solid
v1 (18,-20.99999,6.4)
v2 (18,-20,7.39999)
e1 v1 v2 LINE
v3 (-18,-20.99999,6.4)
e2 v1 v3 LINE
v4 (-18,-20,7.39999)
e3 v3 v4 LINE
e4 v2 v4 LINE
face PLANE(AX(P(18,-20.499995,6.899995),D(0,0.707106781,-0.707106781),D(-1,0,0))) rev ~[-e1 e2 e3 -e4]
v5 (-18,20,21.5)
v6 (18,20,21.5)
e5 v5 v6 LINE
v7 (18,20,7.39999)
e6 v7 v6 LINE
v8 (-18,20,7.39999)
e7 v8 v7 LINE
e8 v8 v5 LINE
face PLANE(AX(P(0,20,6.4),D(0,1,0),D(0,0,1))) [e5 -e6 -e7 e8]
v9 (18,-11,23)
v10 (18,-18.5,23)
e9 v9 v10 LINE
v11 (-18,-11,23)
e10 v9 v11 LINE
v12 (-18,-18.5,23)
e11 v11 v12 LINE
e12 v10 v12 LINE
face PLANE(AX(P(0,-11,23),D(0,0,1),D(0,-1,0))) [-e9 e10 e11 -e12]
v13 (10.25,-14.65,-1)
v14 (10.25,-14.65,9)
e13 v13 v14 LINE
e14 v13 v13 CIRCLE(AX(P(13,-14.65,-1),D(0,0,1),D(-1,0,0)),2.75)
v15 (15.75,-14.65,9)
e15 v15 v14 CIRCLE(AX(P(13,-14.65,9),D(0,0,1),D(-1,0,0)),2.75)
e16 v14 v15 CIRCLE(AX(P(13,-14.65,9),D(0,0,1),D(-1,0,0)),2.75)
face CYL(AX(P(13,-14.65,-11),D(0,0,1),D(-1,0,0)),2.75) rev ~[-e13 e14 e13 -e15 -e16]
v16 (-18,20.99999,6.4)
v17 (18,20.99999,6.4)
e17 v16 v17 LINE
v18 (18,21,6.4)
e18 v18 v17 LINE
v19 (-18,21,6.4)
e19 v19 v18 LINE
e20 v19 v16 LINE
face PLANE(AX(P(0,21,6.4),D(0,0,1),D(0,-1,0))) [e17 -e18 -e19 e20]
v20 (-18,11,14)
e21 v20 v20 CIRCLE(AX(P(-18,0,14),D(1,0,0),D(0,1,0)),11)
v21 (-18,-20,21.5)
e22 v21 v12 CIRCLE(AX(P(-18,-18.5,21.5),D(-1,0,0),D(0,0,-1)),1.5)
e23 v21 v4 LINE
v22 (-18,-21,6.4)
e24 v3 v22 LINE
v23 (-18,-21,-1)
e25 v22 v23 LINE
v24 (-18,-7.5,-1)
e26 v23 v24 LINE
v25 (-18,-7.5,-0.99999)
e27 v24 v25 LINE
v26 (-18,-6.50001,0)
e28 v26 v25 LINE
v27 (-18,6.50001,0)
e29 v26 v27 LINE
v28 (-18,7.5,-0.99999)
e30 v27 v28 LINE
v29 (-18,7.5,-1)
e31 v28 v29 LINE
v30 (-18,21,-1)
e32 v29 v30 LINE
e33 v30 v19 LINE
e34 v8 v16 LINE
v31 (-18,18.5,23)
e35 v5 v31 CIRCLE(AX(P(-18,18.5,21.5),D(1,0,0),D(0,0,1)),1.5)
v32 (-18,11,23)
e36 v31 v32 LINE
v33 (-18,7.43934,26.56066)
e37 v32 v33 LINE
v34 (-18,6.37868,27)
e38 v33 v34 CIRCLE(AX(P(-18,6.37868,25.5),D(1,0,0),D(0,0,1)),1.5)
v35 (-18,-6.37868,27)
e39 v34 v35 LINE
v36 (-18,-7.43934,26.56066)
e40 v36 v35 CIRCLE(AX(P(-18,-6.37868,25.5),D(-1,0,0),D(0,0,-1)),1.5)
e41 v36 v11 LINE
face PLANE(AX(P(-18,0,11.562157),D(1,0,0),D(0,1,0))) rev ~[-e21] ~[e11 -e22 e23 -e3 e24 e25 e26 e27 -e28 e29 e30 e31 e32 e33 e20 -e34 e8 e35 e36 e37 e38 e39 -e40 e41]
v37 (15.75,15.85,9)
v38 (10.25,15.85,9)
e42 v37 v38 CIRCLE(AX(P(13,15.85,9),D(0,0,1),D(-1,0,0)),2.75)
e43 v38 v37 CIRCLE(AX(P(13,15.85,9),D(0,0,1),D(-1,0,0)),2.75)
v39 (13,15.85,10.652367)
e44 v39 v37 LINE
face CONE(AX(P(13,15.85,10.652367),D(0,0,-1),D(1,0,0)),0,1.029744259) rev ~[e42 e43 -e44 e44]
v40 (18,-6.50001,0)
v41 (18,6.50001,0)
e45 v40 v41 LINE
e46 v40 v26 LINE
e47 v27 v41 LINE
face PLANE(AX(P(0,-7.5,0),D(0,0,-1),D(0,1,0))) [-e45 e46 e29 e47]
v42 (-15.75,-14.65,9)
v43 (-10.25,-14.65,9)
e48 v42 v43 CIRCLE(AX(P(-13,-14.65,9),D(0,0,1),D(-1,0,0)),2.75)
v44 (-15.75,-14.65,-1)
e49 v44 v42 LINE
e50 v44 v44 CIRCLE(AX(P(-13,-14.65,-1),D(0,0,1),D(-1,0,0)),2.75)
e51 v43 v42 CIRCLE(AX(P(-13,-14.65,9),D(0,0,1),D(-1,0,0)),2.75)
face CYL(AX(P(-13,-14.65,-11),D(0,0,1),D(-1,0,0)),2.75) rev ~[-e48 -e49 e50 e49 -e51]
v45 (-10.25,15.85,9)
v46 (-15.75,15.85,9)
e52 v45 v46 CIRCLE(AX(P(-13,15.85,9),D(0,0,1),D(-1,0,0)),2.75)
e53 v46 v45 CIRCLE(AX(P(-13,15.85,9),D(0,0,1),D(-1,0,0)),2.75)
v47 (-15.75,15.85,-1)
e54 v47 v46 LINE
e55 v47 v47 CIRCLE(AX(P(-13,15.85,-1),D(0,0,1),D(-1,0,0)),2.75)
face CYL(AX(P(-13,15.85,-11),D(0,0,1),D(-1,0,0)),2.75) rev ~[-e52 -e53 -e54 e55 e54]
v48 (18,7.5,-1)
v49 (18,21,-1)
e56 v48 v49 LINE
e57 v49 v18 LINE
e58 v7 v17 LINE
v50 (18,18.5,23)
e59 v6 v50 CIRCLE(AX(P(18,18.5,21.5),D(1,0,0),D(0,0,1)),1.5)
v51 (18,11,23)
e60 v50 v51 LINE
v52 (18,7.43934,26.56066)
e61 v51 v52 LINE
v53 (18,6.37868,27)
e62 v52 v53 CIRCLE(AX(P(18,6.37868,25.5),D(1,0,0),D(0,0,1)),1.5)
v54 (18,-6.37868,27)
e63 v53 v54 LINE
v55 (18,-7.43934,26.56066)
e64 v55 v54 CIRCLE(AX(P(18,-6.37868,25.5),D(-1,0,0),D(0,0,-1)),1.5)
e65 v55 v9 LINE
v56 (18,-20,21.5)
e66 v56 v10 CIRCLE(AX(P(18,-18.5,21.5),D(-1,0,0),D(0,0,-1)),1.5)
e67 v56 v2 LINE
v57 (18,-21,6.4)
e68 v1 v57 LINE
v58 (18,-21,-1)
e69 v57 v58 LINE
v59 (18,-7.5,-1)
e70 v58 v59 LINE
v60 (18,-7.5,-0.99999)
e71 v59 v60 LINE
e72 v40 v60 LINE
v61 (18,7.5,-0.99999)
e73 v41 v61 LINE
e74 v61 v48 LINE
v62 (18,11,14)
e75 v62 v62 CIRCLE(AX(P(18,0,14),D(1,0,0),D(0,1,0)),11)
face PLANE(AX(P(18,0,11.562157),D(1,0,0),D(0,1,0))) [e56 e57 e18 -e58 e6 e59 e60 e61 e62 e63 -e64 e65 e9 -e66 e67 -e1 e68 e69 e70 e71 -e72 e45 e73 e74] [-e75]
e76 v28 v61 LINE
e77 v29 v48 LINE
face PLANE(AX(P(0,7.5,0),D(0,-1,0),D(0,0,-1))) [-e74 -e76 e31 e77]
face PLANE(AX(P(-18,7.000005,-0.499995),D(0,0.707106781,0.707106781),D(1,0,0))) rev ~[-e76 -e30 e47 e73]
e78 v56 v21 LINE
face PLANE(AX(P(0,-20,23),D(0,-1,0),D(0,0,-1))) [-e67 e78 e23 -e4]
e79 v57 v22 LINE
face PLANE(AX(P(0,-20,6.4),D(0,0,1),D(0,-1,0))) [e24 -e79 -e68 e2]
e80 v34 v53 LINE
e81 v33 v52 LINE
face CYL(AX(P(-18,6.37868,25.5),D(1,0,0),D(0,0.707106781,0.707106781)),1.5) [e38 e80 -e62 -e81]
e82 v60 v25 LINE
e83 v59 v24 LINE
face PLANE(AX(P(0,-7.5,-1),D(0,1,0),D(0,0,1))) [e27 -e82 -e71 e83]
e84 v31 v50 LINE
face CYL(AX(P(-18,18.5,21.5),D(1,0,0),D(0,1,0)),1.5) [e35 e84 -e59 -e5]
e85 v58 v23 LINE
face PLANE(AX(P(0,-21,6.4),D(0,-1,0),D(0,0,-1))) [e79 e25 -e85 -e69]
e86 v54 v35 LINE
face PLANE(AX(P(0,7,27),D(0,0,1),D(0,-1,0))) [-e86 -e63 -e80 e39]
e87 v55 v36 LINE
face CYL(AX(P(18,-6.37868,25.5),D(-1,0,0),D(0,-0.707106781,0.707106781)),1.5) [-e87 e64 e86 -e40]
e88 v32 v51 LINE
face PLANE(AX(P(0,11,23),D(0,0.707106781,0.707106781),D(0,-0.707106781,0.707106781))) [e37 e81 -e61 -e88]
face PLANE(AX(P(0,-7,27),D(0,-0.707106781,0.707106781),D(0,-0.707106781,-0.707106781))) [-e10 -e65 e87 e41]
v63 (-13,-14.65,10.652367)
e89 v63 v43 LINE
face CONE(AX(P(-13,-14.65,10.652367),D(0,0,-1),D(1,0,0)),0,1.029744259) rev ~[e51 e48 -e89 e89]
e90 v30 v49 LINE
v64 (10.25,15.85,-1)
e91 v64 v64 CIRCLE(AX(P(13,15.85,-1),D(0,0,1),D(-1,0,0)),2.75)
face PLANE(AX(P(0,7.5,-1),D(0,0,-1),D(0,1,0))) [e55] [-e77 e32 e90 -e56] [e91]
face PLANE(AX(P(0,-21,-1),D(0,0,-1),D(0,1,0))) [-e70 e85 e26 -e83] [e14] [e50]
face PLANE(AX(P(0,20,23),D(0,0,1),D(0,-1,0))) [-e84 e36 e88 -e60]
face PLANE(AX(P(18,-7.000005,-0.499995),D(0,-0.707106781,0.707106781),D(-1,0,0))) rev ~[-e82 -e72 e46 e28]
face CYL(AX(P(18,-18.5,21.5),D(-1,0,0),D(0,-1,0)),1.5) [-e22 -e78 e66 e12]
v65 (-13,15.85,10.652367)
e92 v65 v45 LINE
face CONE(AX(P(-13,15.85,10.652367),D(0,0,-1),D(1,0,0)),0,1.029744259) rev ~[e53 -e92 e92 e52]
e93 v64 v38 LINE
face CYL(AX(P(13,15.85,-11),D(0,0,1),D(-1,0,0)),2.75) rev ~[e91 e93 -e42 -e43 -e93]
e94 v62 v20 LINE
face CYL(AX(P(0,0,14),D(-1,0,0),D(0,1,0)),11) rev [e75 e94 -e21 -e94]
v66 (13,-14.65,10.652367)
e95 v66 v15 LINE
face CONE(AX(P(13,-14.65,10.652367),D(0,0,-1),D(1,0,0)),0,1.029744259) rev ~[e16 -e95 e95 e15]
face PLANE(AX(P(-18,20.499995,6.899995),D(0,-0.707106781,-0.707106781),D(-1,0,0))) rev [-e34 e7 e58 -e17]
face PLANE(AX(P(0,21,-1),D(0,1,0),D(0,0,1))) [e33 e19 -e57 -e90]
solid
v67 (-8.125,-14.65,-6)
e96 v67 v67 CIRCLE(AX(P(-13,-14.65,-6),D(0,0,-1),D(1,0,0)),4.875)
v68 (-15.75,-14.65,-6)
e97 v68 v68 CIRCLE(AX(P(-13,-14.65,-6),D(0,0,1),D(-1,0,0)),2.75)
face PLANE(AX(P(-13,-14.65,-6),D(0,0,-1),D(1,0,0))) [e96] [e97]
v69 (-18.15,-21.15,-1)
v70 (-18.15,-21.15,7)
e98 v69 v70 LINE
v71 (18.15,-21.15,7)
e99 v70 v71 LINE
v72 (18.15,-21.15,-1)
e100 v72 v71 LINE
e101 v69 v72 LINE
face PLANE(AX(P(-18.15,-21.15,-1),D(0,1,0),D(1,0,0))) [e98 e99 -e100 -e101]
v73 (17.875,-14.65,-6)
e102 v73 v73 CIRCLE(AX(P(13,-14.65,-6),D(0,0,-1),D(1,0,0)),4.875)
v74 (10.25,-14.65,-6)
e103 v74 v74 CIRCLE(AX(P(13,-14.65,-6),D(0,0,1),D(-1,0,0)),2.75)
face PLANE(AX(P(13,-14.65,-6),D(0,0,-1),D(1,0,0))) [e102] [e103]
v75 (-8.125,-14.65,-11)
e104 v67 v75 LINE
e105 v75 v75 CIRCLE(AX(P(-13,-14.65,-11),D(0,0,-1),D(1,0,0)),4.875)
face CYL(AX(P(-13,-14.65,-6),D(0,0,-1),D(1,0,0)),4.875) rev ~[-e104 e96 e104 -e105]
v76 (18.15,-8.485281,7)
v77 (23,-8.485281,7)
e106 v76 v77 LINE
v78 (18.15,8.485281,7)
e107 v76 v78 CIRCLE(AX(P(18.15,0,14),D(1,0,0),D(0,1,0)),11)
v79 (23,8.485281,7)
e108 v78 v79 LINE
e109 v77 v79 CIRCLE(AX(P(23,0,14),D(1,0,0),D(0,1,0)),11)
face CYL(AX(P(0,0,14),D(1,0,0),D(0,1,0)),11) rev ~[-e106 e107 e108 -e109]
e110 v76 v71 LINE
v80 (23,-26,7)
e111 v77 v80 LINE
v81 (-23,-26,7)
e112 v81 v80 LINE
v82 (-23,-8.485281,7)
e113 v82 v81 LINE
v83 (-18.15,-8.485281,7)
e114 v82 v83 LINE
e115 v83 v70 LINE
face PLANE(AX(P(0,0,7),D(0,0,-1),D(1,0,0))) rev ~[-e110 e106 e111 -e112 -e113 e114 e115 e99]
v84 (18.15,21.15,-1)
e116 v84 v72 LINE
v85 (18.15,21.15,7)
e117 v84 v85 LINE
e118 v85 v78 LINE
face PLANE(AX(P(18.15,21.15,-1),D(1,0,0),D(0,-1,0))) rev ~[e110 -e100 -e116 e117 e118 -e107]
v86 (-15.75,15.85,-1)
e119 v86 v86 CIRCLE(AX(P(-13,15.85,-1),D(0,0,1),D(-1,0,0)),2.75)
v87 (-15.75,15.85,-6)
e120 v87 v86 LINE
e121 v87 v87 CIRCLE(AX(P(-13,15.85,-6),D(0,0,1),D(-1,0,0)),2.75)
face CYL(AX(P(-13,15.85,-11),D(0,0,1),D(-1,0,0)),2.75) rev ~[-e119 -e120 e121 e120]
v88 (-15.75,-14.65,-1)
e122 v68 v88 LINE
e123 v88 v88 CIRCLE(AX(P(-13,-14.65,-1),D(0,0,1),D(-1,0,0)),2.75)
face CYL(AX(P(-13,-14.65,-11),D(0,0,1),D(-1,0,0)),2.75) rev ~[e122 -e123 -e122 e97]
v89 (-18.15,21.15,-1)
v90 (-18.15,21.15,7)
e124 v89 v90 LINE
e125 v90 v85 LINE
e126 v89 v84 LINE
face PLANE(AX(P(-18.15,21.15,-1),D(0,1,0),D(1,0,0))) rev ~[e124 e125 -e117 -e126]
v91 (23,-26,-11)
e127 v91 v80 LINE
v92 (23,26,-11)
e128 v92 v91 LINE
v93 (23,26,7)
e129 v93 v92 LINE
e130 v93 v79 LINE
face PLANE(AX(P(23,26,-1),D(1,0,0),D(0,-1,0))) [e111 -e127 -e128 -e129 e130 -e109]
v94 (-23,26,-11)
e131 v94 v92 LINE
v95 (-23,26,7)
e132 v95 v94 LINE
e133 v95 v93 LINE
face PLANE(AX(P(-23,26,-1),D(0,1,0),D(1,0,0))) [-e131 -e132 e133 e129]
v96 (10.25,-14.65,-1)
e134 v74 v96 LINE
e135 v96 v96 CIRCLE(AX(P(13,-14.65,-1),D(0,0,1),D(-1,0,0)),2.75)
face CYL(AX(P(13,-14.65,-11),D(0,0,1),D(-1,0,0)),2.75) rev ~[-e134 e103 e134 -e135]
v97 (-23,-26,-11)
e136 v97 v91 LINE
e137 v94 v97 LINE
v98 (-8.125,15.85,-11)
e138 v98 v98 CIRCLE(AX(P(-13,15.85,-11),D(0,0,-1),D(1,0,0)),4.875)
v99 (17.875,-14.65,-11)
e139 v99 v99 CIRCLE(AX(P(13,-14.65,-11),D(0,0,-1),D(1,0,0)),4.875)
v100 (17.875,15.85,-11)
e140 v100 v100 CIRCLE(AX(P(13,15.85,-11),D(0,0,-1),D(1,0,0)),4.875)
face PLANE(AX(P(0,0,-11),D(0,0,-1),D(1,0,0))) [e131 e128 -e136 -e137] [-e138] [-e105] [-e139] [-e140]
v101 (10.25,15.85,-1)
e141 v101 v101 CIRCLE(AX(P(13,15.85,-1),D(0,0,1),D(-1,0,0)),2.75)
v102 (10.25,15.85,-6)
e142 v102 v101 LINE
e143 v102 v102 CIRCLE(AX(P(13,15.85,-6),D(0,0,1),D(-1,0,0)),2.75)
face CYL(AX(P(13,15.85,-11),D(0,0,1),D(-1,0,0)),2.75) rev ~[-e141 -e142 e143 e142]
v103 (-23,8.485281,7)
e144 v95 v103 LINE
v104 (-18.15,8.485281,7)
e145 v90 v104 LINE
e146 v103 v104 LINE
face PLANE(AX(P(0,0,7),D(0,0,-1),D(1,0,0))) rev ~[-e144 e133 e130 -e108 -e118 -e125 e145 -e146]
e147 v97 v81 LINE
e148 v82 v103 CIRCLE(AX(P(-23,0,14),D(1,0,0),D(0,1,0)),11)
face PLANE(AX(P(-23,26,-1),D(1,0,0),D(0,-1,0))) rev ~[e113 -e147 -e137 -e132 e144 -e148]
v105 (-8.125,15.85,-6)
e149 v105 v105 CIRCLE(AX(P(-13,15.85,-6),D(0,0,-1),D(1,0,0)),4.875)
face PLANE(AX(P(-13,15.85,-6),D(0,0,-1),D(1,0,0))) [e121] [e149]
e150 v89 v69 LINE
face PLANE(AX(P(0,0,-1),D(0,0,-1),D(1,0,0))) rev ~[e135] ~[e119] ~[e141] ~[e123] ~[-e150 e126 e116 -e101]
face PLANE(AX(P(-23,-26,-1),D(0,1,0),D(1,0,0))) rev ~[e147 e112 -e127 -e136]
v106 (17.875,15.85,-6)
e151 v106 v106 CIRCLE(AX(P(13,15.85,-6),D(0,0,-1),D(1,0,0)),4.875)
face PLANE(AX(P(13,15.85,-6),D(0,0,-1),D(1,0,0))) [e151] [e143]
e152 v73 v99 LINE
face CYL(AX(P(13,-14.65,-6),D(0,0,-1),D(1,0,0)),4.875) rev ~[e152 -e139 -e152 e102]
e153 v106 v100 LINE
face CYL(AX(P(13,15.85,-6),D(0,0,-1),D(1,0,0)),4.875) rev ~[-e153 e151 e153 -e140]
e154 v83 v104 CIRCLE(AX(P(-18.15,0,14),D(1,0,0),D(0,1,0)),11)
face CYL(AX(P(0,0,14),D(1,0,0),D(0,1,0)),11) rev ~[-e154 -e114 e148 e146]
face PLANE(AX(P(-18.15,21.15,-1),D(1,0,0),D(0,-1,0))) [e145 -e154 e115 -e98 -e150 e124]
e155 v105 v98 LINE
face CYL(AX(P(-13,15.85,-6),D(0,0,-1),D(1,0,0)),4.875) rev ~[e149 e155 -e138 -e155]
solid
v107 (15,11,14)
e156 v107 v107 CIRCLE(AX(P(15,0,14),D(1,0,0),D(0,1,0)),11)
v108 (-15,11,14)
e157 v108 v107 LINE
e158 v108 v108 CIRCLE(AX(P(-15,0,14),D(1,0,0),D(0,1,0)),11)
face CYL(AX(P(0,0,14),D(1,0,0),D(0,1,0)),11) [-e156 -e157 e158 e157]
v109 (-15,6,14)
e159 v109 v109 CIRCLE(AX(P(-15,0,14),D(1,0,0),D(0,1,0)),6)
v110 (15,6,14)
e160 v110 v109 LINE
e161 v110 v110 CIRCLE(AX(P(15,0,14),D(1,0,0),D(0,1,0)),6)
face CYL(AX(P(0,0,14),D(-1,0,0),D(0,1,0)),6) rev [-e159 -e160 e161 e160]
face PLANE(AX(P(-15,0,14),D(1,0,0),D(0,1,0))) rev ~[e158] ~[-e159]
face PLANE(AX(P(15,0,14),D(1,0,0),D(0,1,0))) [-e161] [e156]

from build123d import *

# Parameters (mm, degrees)
F1_R              = 11
F2_DEPTH          = 18
F1_R_2            = 6
F3_DEPTH          = 15
F4_SIZE           = 0.99999
F5_R              = 1.5
F6_W              = 46
F6_H              = 52
F6_W_2            = 36.3
F6_H_2            = 42.3
F6_W_3            = 26
F6_H_3            = 23.35
F6_H_4            = 7.15
F7_DEPTH          = 10
F8_DEPTH          = 8
F10_D             = 5.5
F10_DEPTH         = 20
F10_CBORE_D       = 9.75
F10_CBORE_DEPTH   = 5
F10_TIP           = 1.6523667023
F10_2_D           = 5.5
F10_2_DEPTH       = 20
F10_2_CBORE_D     = 9.75
F10_2_CBORE_DEPTH = 5
F10_2_TIP         = 1.6523667023
F11_DEPTH         = 57.8


# Not quite as in the source:
# - a fillet or chamfer is up to 0.001 mm smaller than in the source, because OpenCascade refuses the exact size


with BuildPart() as f2:
    # F1 (on Right) → F2 (new body, symmetric)
    with BuildSketch(Plane.YZ):
        Polygon((-7.5, 0), (0, 0), (7.5, 0), (7.5, -1), (21, -1), (21, 6.4), (20, 6.4), (20, 23), (11, 23), (7, 27), (0, 27), (-7, 27), (-11, 23), (-20, 23), (-20, 6.4), (-21, 6.4), (-21, -1), (-7.5, -1), align=None)
        with Locations((0, 14)):
            Circle(F1_R, mode=Mode.SUBTRACT)
    extrude(amount=F2_DEPTH, both=True)

    # F4 (size 1 in the source; OpenCascade refuses exactly that, so slightly less here)
    f4_edges = [f2.edges().sort_by_distance(p)[0] for p in [
        (0, -20, 6.4),
        (0, 20, 6.4),
        (0, -7.5, 0),
        (0, 7.5, 0),
    ]]
    chamfer(f4_edges, length=F4_SIZE)

    # F5
    f5_edges = [f2.edges().sort_by_distance(p)[0] for p in [
        (0, -7, 27),
        (0, 7, 27),
        (0, -20, 23),
        (0, 20, 23),
    ]]
    fillet(f5_edges, radius=F5_R)

    # F10
    with Locations(Plane(origin=(0, 0, -11), x_dir=(1, 0, 0), z_dir=(0, 0, -1))):
        with Locations((-13, -15.85), (13, -15.85), (-13, 14.65), (13, 14.65)):
            CounterBoreHole(F10_D / 2, F10_CBORE_D / 2, F10_CBORE_DEPTH, depth=F10_DEPTH)
            with Locations((0, 0, -(F10_DEPTH + F10_TIP / 2))):  # 118° drill point
                Cone(0, F10_D / 2, F10_TIP, mode=Mode.SUBTRACT)


with BuildPart() as f3:
    # F1 (on Right) → F3 (new body, symmetric)
    with BuildSketch(Plane.YZ):
        with Locations((0, 14)):
            Circle(F1_R)
        with Locations((0, 14)):
            Circle(F1_R_2, mode=Mode.SUBTRACT)
    extrude(amount=F3_DEPTH, both=True)


with BuildPart() as f7:
    # F6 (on face) → F7 (new body)
    with BuildSketch(Plane(origin=(0, 0, -1), x_dir=(1, 0, 0), z_dir=(0, 0, -1))):
        Rectangle(F6_W, F6_H)
        Rectangle(F6_W_2, F6_H_2, mode=Mode.SUBTRACT)
        Rectangle(F6_W_2, F6_H_2)
        Polygon((18, 21), (18, 7.5), (18, -21), (-18, -21), (-18, 7.5), (-18, 21), align=None, mode=Mode.SUBTRACT)
        with Locations((0, -4.175)):
            Rectangle(F6_W_3, F6_H_3)
        Polygon((18, 7.5), (13, 7.5), (13, -15.85), (-13, -15.85), (-13, 7.5), (-18, 7.5), (-18, -21), (18, -21), align=None)
        Polygon((-13, 14.65), (13, 14.65), (13, 7.5), (18, 7.5), (18, 21), (-18, 21), (-18, 7.5), (-13, 7.5), align=None)
        with Locations((0, 11.075)):
            Rectangle(F6_W_3, F6_H_4)
    extrude(amount=F7_DEPTH)

    # F6 (on face) → F8 (join)
    with BuildSketch(Plane(origin=(0, 0, -1), x_dir=(1, 0, 0), z_dir=(0, 0, -1))):
        Rectangle(F6_W, F6_H)
        Rectangle(F6_W_2, F6_H_2, mode=Mode.SUBTRACT)
    extrude(amount=-F8_DEPTH)

    # F10#2
    with Locations(Plane(origin=(0, 0, -11), x_dir=(1, 0, 0), z_dir=(0, 0, -1))):
        with Locations((-13, -15.85), (13, -15.85), (-13, 14.65), (13, 14.65)):
            CounterBoreHole(F10_2_D / 2, F10_2_CBORE_D / 2, F10_2_CBORE_DEPTH, depth=F10_2_DEPTH)
            with Locations((0, 0, -(F10_2_DEPTH + F10_2_TIP / 2))):  # 118° drill point
                Cone(0, F10_2_D / 2, F10_2_TIP, mode=Mode.SUBTRACT)

    # F1 (on Right) → F11 (cut, symmetric)
    with BuildSketch(Plane.YZ):
        with Locations((0, 14)):
            Circle(F1_R)
        with Locations((0, 14)):
            Circle(F1_R_2, mode=Mode.SUBTRACT)
        with Locations((0, 14)):
            Circle(F1_R_2)
    extrude(amount=F11_DEPTH, both=True, mode=Mode.SUBTRACT)


solid = Compound([f2.part, f3.part, f7.part])
